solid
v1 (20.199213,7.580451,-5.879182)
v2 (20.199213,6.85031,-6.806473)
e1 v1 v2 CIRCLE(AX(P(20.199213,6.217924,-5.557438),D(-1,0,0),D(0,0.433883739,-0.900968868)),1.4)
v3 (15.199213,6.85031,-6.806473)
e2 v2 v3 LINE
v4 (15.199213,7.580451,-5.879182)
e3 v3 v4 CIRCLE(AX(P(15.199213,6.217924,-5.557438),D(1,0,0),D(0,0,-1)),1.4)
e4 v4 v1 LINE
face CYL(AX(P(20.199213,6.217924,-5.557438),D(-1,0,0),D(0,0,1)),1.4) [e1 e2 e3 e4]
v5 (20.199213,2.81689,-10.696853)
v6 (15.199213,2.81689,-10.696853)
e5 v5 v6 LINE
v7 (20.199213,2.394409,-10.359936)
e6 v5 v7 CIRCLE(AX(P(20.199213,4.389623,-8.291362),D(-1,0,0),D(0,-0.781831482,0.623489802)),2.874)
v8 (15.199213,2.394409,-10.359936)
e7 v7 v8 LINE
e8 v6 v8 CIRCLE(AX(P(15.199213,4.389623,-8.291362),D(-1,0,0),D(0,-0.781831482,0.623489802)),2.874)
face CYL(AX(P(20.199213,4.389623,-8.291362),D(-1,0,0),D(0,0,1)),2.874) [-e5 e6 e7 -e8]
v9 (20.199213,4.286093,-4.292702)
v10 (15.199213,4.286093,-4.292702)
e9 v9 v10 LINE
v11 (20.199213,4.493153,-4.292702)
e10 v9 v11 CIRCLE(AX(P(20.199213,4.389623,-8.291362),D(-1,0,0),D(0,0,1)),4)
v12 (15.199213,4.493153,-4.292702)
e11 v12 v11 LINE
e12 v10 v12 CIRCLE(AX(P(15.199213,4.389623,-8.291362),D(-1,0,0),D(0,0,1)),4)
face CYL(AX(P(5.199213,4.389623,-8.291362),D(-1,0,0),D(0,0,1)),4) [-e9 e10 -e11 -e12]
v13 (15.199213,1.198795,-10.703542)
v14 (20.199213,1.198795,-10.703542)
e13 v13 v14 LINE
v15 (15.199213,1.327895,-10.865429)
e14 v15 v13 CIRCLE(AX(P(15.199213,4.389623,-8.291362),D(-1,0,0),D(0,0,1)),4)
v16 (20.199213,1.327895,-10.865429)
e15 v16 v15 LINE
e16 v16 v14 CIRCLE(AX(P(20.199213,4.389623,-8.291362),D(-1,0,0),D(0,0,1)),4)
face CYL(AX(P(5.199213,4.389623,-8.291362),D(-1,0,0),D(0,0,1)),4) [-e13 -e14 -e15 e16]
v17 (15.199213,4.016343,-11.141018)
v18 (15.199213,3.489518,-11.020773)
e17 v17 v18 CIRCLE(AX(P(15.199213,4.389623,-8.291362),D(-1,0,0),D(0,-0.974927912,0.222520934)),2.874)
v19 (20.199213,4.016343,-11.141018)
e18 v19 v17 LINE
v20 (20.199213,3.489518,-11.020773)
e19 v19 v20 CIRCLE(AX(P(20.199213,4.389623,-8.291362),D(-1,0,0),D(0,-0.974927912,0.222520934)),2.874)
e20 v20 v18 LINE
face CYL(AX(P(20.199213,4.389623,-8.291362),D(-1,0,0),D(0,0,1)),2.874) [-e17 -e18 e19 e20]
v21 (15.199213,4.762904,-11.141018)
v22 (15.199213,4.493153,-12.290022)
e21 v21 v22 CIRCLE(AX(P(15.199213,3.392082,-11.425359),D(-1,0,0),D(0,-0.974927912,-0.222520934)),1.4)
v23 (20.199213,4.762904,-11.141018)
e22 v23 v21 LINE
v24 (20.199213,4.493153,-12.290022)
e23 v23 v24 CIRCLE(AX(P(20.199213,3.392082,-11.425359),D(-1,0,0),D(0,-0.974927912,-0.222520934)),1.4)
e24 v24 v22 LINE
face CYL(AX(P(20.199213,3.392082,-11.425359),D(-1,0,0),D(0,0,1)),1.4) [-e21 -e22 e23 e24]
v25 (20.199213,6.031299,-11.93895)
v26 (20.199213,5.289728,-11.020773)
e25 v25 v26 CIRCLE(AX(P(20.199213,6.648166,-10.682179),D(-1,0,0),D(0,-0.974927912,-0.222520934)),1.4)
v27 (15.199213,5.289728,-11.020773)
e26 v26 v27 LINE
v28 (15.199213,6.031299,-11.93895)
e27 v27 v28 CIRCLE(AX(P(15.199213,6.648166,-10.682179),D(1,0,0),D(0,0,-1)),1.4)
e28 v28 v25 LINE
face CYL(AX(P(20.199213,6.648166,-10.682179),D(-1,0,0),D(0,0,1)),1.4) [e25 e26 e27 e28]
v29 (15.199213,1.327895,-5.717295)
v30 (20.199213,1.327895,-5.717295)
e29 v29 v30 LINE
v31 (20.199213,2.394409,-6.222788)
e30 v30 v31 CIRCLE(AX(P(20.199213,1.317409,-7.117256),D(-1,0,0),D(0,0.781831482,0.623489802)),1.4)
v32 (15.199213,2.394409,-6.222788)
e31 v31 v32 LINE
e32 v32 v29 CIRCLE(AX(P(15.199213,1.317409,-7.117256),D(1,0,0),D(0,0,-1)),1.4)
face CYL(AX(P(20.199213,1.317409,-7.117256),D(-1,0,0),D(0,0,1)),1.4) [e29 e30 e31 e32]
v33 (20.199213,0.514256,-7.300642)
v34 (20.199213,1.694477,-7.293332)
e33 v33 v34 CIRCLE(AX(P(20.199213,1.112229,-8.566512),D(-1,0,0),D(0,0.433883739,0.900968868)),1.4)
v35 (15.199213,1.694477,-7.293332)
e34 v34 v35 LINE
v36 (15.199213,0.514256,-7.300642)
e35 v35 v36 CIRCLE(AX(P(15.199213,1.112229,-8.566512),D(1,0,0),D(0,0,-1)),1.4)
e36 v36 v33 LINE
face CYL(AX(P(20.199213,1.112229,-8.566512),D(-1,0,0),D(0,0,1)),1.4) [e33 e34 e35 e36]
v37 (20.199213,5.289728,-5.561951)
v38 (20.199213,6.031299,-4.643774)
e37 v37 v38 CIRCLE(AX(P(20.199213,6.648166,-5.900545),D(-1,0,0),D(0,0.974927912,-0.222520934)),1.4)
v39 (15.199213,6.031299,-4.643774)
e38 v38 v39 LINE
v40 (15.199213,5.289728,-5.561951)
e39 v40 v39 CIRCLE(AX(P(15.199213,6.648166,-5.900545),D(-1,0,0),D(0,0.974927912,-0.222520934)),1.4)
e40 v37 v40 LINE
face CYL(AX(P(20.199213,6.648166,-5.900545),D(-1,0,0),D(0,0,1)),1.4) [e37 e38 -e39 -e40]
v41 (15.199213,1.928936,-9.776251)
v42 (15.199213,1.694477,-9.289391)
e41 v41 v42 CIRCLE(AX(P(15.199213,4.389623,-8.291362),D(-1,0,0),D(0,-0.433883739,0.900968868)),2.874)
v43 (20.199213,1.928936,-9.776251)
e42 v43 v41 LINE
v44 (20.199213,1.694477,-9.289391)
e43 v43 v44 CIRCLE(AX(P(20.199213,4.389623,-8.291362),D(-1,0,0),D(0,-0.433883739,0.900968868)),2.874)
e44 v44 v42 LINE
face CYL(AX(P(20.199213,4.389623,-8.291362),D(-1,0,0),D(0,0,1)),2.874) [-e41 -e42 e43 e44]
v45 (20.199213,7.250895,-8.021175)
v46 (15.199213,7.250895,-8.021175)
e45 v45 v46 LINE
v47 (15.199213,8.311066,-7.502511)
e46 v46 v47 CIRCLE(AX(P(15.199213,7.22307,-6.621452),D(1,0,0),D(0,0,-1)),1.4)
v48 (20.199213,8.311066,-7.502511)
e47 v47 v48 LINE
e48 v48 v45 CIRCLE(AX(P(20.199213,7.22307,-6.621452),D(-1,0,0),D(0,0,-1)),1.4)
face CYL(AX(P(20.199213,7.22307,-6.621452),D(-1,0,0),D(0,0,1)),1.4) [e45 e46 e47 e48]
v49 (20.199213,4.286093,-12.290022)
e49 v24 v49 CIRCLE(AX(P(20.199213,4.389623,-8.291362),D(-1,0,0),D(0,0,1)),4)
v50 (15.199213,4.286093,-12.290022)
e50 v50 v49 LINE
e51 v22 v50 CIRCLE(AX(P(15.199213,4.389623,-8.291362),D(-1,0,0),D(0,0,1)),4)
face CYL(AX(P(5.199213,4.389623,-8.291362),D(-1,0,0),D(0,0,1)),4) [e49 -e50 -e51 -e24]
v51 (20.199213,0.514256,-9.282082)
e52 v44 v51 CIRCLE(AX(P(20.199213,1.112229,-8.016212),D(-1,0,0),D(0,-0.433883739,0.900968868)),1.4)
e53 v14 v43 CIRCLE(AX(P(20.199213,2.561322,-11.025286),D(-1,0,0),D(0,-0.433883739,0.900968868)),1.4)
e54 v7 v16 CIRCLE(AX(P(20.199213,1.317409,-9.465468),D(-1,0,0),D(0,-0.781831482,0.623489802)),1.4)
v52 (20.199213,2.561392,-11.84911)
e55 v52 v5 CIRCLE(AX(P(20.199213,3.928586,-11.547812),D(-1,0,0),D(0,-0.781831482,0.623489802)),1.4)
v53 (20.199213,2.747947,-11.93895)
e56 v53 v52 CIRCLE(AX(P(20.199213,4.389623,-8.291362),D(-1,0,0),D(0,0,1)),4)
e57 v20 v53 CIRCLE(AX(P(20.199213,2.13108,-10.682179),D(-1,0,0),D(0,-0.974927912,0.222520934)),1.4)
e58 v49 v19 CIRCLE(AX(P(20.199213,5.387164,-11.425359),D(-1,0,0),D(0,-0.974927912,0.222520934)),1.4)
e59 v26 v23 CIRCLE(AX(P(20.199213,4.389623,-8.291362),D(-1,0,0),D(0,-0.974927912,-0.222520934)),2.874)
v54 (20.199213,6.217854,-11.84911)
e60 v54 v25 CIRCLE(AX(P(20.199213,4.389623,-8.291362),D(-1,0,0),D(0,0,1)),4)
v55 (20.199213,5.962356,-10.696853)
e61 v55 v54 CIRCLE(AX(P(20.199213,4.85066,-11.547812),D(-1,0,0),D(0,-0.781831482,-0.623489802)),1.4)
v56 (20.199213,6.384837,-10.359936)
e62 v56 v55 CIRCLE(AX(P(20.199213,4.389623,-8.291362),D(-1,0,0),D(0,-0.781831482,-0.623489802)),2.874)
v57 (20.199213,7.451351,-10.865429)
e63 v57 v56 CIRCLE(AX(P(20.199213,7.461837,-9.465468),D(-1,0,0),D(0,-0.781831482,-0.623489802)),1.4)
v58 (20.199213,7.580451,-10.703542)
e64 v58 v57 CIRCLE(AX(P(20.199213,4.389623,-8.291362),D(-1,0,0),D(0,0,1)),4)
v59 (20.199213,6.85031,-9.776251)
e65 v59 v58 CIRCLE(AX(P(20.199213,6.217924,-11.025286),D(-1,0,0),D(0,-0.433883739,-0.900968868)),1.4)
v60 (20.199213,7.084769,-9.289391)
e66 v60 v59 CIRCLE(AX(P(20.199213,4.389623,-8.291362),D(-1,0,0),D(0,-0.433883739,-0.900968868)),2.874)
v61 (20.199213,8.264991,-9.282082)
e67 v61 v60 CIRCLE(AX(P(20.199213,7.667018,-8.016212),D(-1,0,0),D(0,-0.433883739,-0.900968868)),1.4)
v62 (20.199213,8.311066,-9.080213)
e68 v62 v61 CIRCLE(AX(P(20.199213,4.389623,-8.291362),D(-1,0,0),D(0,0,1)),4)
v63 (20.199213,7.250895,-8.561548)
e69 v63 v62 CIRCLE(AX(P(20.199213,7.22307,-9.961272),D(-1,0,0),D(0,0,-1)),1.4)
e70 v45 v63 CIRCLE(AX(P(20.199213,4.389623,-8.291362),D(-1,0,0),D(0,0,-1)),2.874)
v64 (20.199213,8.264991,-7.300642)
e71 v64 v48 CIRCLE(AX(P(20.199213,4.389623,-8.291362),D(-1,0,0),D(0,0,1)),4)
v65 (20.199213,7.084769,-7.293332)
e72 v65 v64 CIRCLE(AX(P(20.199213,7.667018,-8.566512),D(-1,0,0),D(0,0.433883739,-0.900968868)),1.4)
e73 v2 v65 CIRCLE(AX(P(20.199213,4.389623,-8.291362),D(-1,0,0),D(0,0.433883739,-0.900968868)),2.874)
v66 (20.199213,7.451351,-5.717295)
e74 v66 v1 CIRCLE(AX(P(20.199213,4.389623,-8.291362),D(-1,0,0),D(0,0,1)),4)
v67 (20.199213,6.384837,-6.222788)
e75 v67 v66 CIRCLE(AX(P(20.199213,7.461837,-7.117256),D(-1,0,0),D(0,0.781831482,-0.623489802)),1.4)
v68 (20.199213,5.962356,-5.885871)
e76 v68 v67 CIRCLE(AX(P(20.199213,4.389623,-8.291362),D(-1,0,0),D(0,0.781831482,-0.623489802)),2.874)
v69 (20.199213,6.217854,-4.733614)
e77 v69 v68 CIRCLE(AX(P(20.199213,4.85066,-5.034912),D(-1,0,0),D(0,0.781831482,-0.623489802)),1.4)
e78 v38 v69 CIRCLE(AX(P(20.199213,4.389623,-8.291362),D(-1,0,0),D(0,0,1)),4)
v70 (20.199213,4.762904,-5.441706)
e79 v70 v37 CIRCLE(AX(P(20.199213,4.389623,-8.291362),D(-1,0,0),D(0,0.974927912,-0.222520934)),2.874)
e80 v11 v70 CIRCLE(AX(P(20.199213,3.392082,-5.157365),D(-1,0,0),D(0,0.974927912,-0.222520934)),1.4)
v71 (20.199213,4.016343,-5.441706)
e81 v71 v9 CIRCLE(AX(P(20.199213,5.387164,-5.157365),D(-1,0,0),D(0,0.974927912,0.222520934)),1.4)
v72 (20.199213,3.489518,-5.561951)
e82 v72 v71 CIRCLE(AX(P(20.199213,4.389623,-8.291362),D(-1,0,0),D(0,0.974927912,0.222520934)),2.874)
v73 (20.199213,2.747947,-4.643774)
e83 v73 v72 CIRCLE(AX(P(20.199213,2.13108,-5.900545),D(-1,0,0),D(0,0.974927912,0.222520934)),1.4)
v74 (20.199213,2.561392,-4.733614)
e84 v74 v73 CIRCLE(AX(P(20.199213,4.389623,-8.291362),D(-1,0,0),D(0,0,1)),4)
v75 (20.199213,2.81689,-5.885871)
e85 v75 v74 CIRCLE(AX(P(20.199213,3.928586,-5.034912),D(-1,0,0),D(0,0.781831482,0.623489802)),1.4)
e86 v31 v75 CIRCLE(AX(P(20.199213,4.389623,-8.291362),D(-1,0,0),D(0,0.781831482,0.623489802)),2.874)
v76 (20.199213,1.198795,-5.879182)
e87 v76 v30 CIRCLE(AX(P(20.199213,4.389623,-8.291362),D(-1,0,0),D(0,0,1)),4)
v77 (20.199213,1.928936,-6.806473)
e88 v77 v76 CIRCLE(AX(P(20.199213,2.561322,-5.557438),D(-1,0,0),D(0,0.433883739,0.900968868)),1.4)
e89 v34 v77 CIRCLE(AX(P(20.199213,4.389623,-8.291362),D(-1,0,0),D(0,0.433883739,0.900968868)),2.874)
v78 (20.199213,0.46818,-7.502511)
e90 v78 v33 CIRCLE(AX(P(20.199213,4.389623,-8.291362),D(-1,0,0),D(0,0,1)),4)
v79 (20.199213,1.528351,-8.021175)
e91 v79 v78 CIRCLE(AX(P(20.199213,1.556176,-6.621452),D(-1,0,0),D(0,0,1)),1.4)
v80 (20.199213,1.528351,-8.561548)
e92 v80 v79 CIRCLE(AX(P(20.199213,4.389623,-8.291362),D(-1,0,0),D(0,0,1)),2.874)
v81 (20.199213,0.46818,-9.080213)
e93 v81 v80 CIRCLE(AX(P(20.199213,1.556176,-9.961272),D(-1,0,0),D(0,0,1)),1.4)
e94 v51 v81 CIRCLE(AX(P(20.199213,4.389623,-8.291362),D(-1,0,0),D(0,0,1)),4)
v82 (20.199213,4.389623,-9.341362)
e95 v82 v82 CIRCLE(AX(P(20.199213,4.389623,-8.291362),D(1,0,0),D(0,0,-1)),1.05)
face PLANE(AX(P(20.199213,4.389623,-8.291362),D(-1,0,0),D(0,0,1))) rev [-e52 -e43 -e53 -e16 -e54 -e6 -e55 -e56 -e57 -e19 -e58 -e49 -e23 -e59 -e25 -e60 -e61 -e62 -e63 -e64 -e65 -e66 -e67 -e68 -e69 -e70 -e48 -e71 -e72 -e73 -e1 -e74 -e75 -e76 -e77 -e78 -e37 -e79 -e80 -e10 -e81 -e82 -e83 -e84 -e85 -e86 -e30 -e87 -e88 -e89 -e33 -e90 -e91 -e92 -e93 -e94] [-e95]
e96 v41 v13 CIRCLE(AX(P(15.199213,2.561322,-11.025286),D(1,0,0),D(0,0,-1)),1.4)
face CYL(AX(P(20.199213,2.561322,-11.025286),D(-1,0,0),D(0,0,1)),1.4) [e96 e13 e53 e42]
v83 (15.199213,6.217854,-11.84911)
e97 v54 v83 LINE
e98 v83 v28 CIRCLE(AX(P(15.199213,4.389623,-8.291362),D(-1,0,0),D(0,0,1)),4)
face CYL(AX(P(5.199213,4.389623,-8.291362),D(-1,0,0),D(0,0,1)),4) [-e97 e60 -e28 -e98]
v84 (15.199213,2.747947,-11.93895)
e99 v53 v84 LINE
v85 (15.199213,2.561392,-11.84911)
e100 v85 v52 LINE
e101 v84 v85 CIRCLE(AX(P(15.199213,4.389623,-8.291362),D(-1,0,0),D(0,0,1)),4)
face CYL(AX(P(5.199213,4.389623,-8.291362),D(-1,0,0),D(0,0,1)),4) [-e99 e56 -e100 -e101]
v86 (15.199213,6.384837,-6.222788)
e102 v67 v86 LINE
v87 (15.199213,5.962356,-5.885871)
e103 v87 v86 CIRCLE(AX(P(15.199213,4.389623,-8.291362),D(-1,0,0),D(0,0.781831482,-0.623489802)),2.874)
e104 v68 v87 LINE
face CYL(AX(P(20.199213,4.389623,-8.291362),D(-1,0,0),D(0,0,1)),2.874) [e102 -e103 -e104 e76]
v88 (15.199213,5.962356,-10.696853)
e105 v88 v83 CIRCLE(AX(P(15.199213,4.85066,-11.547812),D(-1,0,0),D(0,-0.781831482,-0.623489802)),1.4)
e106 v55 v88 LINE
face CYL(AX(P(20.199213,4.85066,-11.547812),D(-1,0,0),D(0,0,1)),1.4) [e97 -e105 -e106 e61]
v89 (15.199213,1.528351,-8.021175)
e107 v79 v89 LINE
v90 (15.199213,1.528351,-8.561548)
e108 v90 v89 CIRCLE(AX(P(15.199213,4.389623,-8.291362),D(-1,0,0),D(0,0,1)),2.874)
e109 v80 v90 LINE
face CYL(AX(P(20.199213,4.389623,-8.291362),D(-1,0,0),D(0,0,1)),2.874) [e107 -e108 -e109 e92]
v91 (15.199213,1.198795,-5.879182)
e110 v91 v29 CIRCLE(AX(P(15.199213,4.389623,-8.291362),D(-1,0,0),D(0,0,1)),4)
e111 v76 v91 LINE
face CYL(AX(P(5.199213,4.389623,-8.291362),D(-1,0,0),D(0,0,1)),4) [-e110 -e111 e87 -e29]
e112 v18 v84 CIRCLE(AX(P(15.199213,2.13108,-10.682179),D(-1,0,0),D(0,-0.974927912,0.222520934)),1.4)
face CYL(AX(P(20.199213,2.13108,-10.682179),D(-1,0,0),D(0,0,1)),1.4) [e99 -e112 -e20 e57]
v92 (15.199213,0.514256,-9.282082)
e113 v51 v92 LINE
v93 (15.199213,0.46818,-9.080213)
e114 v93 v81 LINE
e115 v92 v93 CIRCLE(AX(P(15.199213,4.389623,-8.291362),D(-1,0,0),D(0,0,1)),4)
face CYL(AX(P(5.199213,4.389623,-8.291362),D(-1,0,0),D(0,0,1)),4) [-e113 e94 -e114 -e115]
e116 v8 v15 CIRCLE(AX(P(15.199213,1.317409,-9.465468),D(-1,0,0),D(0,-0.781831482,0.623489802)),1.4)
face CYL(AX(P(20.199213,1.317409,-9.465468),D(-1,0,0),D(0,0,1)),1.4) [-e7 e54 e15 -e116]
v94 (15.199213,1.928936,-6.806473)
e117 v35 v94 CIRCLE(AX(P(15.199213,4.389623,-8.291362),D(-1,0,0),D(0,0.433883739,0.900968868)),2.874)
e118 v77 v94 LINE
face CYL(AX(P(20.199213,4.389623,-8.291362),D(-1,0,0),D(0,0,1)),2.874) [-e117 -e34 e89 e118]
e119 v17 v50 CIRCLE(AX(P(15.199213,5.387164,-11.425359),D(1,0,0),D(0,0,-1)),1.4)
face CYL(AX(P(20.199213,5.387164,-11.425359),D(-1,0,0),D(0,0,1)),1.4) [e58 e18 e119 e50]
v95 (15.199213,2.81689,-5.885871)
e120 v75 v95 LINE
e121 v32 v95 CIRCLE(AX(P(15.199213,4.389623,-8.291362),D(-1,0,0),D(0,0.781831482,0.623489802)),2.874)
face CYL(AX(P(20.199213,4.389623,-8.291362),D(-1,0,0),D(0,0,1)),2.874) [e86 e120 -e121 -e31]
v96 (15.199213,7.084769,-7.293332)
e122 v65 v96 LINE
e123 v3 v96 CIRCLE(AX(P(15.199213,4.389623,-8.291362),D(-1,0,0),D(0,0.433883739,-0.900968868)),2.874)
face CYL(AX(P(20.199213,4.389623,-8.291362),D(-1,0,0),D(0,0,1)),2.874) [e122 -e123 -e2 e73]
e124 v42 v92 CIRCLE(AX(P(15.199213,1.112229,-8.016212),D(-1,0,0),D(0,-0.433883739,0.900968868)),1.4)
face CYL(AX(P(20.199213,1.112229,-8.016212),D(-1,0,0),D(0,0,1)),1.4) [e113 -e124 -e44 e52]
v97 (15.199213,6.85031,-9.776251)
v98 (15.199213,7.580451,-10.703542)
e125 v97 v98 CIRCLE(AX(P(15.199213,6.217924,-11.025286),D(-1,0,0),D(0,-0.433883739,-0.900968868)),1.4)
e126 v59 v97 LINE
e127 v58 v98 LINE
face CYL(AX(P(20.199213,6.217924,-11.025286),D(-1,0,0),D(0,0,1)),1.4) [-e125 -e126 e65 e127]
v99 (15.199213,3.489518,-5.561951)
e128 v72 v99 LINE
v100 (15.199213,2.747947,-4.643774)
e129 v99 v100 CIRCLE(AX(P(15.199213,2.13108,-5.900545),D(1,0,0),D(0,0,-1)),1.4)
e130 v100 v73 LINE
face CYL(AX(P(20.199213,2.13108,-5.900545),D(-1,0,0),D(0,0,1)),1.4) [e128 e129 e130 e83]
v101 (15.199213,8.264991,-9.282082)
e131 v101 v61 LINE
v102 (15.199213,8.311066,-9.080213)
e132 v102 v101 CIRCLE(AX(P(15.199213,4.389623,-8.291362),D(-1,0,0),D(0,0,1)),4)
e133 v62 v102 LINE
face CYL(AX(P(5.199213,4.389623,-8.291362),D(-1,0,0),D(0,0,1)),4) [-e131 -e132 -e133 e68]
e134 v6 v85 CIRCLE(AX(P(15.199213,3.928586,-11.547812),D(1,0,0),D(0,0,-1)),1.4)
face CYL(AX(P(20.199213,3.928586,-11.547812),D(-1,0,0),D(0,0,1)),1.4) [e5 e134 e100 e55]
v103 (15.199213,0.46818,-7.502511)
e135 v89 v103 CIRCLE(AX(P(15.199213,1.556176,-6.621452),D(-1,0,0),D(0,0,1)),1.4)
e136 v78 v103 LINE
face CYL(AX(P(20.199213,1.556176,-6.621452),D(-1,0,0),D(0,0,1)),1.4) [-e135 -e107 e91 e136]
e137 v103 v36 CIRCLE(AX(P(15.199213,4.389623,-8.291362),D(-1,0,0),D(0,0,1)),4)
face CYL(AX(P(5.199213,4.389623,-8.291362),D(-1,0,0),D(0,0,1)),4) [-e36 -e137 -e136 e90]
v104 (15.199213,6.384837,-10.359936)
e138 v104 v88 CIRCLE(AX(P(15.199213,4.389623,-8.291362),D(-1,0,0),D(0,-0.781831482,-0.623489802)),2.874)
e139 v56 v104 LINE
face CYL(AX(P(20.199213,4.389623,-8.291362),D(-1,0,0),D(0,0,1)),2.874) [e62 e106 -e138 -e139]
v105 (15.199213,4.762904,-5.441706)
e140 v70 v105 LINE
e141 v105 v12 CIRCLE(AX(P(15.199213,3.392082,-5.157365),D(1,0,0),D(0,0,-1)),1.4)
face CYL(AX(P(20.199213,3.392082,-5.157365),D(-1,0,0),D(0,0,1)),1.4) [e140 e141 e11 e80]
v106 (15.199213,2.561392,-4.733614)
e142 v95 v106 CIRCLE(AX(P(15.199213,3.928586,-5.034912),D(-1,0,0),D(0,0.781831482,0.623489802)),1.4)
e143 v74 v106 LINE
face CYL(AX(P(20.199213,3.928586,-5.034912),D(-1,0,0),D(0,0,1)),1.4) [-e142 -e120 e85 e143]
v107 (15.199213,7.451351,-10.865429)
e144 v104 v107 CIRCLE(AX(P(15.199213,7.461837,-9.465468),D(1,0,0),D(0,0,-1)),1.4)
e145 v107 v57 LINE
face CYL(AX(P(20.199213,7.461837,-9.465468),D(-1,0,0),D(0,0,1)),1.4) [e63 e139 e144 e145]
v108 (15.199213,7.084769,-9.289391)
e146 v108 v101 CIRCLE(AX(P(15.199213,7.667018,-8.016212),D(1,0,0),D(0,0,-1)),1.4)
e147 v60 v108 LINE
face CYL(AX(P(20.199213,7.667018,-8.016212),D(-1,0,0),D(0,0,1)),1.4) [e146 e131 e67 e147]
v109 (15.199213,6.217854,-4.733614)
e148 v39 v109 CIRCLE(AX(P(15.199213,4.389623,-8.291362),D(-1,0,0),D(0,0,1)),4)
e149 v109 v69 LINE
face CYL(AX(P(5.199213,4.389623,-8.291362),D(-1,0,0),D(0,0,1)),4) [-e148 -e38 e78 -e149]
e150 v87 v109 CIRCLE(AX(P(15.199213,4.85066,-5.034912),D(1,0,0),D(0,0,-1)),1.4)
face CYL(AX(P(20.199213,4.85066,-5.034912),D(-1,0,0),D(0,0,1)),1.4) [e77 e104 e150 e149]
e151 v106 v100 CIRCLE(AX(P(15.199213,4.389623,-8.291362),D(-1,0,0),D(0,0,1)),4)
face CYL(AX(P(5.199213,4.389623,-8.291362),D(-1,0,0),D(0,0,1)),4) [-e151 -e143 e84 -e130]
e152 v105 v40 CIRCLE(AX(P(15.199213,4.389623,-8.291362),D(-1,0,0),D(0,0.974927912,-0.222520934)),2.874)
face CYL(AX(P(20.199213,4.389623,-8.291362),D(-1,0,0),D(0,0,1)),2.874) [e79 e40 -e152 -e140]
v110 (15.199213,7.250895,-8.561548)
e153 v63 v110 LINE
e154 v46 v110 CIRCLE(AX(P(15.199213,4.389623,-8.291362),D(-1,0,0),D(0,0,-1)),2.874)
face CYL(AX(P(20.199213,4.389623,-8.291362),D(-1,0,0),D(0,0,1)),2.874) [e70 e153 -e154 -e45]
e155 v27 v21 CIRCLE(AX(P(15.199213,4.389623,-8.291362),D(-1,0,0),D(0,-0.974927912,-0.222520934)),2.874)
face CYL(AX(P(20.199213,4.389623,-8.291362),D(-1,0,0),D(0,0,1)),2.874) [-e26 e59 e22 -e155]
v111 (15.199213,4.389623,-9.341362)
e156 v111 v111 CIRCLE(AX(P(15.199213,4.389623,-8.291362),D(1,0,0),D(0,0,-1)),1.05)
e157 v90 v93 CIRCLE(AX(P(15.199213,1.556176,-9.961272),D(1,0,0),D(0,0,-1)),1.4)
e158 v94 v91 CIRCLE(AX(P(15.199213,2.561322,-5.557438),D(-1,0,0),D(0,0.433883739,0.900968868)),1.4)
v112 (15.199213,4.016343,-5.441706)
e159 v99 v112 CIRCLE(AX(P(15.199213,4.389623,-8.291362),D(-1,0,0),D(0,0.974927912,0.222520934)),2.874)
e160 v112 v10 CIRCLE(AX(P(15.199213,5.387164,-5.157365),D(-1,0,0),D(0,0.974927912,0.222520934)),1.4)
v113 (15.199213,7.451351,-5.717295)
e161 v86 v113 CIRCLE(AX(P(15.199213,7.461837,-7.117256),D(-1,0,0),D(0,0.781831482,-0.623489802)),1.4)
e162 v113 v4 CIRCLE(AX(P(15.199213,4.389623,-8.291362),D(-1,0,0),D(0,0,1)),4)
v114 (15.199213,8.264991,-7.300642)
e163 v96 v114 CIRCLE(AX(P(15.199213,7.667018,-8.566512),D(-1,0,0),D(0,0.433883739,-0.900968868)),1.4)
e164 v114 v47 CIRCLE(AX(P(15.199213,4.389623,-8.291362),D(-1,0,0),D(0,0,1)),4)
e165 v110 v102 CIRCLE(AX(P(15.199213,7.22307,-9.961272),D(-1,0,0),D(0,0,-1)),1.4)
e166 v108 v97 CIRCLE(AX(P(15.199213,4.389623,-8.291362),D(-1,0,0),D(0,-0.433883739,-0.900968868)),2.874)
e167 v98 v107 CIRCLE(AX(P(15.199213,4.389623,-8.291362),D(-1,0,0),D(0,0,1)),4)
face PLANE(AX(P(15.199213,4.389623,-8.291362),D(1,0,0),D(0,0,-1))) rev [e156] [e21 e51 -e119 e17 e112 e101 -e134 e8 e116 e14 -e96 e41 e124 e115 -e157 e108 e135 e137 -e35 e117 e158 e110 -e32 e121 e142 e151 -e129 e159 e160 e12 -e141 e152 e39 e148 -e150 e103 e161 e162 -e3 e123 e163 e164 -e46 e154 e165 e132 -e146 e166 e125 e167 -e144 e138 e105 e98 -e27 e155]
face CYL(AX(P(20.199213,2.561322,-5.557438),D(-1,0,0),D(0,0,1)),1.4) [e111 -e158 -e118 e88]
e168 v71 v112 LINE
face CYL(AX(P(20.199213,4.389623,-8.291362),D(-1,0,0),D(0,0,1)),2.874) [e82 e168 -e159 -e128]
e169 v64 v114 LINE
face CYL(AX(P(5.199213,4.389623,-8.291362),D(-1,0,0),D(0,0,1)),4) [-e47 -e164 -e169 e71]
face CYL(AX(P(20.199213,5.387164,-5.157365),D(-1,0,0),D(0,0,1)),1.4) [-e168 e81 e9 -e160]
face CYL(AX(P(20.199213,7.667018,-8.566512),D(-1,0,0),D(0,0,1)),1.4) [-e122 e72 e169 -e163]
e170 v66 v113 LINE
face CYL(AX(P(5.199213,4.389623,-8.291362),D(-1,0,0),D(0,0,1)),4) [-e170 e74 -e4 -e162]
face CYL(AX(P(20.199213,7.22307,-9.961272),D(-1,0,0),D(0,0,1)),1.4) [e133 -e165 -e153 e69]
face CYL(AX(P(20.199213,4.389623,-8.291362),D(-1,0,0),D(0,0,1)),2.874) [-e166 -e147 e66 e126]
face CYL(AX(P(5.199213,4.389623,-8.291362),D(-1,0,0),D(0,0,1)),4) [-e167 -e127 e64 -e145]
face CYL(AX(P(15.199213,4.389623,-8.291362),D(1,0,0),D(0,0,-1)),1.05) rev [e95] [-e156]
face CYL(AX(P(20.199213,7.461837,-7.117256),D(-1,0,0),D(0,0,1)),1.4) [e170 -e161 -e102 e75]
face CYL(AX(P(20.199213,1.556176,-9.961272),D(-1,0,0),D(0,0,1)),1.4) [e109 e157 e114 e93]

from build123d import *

# Parameters (mm, degrees)
SPUR_START             = 15.199213342
SPUR_GEAR_AM_OUTLINE_R = 2.5
SPUR_GEAR_AM_DEPTH     = 5
SKETCH9_R              = 2.5
SKETCH9_R_2            = 1.05
BOSS_EXTRUDE1_DEPTH    = 5


# Read off the part's stored shape, not the designer's step: spur gear_am
with BuildPart() as part:
    # spur gear_am outline → spur gear_am (new body)
    with BuildSketch(Plane.YZ.offset(SPUR_START)):
        with BuildLine():
            ThreePointArc((2.747947228, -4.643773619), (2.654088149, -4.687486435), (2.561391914, -4.733613923))
            ThreePointArc((2.561391914, -4.733613923), (2.561783739, -5.337982285), (2.816889806, -5.88587111))
            ThreePointArc((2.816889806, -5.88587111), (2.597713415, -6.044378226), (2.394409068, -6.222788256))
            ThreePointArc((2.394409068, -6.222788256), (1.9170234, -5.852161498), (1.327895004, -5.717294884))
            ThreePointArc((1.327895004, -5.717294884), (1.262297175, -5.797402699), (1.198794721, -5.879181519))
            ThreePointArc((1.198794721, -5.879181519), (1.461373347, -6.423528591), (1.928936024, -6.806472991))
            ThreePointArc((1.928936024, -6.806472991), (1.800238579, -7.04438004), (1.694476903, -7.293332374))
            ThreePointArc((1.694476903, -7.293332374), (1.103558354, -7.166539081), (0.514255579, -7.300641692))
            ThreePointArc((0.514255579, -7.300641692), (0.489911456, -7.401278171), (0.468180222, -7.502511024))
            ThreePointArc((0.468180222, -7.502511024), (0.940938733, -7.879022193), (1.528351497, -8.021175333))
            ThreePointArc((1.528351497, -8.021175333), (1.515623105, -8.291361907), (1.528351497, -8.56154848))
            ThreePointArc((1.528351497, -8.56154848), (0.940938733, -8.70370162), (0.468180222, -9.080212789))
            ThreePointArc((0.468180222, -9.080212789), (0.489911456, -9.181445642), (0.514255579, -9.28208212))
            ThreePointArc((0.514255579, -9.28208212), (1.103558354, -9.416184732), (1.694476903, -9.289391439))
            ThreePointArc((1.694476903, -9.289391439), (1.800238579, -9.538343772), (1.928936024, -9.776250821))
            ThreePointArc((1.928936024, -9.776250821), (1.461373347, -10.159195221), (1.198794721, -10.703542294))
            ThreePointArc((1.198794721, -10.703542294), (1.262297175, -10.785321114), (1.327895004, -10.865428928))
            ThreePointArc((1.327895004, -10.865428928), (1.9170234, -10.730562315), (2.394409068, -10.359935556))
            ThreePointArc((2.394409068, -10.359935556), (2.597713414, -10.538345587), (2.816889806, -10.696852703))
            ThreePointArc((2.816889806, -10.696852703), (2.561783739, -11.244741528), (2.561391914, -11.84910989))
            ThreePointArc((2.561391914, -11.84910989), (2.654088149, -11.895237378), (2.747947228, -11.938950194))
            ThreePointArc((2.747947228, -11.938950194), (3.220217142, -11.561826343), (3.489517843, -11.020773293))
            ThreePointArc((3.489517843, -11.020773293), (3.750097941, -11.093304726), (4.016342706, -11.14101763))
            ThreePointArc((4.016342706, -11.14101763), (4.024220134, -11.745334779), (4.286092716, -12.290021864))
            ThreePointArc((4.286092716, -12.290021864), (4.389623105, -12.291361906), (4.493153494, -12.290021864))
            ThreePointArc((4.493153494, -12.290021864), (4.755026076, -11.745334779), (4.762903504, -11.14101763))
            ThreePointArc((4.762903504, -11.14101763), (5.029148269, -11.093304726), (5.289728367, -11.020773293))
            ThreePointArc((5.289728367, -11.020773293), (5.559029068, -11.561826343), (6.031298982, -11.938950194))
            ThreePointArc((6.031298982, -11.938950194), (6.125158061, -11.895237378), (6.217854296, -11.84910989))
            ThreePointArc((6.217854296, -11.84910989), (6.217462471, -11.244741528), (5.962356404, -10.696852703))
            ThreePointArc((5.962356404, -10.696852703), (6.181532796, -10.538345587), (6.384837142, -10.359935556))
            ThreePointArc((6.384837142, -10.359935556), (6.86222281, -10.730562315), (7.451351206, -10.865428928))
            ThreePointArc((7.451351206, -10.865428928), (7.516949035, -10.785321114), (7.580451489, -10.703542294))
            ThreePointArc((7.580451489, -10.703542294), (7.317872863, -10.159195221), (6.850310186, -9.776250821))
            ThreePointArc((6.850310186, -9.776250821), (6.979007631, -9.538343772), (7.084769307, -9.289391439))
            ThreePointArc((7.084769307, -9.289391439), (7.675687856, -9.416184732), (8.26499063, -9.28208212))
            ThreePointArc((8.26499063, -9.28208212), (8.289334754, -9.181445642), (8.311065988, -9.080212789))
            ThreePointArc((8.311065988, -9.080212789), (7.838307477, -8.70370162), (7.250894713, -8.56154848))
            ThreePointArc((7.250894713, -8.56154848), (7.263623105, -8.291361907), (7.250894713, -8.021175333))
            ThreePointArc((7.250894713, -8.021175333), (7.838307477, -7.879022193), (8.311065988, -7.502511024))
            ThreePointArc((8.311065988, -7.502511024), (8.289334754, -7.40127817), (8.26499063, -7.300641692))
            ThreePointArc((8.26499063, -7.300641692), (7.675687856, -7.166539081), (7.084769307, -7.293332374))
            ThreePointArc((7.084769307, -7.293332374), (6.979007631, -7.04438004), (6.850310186, -6.806472991))
            ThreePointArc((6.850310186, -6.806472991), (7.317872863, -6.423528591), (7.580451489, -5.879181519))
            ThreePointArc((7.580451489, -5.879181519), (7.516949035, -5.797402699), (7.451351206, -5.717294884))
            ThreePointArc((7.451351206, -5.717294884), (6.86222281, -5.852161498), (6.384837142, -6.222788256))
            ThreePointArc((6.384837142, -6.222788256), (6.181532795, -6.044378226), (5.962356404, -5.88587111))
            ThreePointArc((5.962356404, -5.88587111), (6.217462471, -5.337982285), (6.217854296, -4.733613923))
            ThreePointArc((6.217854296, -4.733613923), (6.125158061, -4.687486435), (6.031298982, -4.643773619))
            ThreePointArc((6.031298982, -4.643773619), (5.559029068, -5.02089747), (5.289728367, -5.56195052))
            ThreePointArc((5.289728367, -5.56195052), (5.029148269, -5.489419087), (4.762903504, -5.441706183))
            ThreePointArc((4.762903504, -5.441706183), (4.755026076, -4.837389034), (4.493153494, -4.292701948))
            ThreePointArc((4.493153494, -4.292701948), (4.389623105, -4.291361906), (4.286092716, -4.292701948))
            ThreePointArc((4.286092716, -4.292701948), (4.024220134, -4.837389034), (4.016342706, -5.441706183))
            ThreePointArc((4.016342706, -5.441706183), (3.750097941, -5.489419087), (3.489517843, -5.56195052))
            ThreePointArc((3.489517843, -5.56195052), (3.220217142, -5.02089747), (2.747947228, -4.643773619))
        make_face()
        with Locations((4.389623105, -8.291361906)):
            Circle(SPUR_GEAR_AM_OUTLINE_R, mode=Mode.SUBTRACT)
    extrude(amount=SPUR_GEAR_AM_DEPTH)

    # Sketch9 → Boss-Extrude1 (add, through all)
    with BuildSketch(Plane(origin=(20.199213342, 0, 0), x_dir=(0, 0, -1), z_dir=(1, 0, 0))):
        with Locations((8.291361906, 4.389623105)):
            Circle(SKETCH9_R)
        with Locations((8.291361906, 4.389623105)):
            Circle(SKETCH9_R_2, mode=Mode.SUBTRACT)
    extrude(amount=-BOSS_EXTRUDE1_DEPTH)


solid = part.part
